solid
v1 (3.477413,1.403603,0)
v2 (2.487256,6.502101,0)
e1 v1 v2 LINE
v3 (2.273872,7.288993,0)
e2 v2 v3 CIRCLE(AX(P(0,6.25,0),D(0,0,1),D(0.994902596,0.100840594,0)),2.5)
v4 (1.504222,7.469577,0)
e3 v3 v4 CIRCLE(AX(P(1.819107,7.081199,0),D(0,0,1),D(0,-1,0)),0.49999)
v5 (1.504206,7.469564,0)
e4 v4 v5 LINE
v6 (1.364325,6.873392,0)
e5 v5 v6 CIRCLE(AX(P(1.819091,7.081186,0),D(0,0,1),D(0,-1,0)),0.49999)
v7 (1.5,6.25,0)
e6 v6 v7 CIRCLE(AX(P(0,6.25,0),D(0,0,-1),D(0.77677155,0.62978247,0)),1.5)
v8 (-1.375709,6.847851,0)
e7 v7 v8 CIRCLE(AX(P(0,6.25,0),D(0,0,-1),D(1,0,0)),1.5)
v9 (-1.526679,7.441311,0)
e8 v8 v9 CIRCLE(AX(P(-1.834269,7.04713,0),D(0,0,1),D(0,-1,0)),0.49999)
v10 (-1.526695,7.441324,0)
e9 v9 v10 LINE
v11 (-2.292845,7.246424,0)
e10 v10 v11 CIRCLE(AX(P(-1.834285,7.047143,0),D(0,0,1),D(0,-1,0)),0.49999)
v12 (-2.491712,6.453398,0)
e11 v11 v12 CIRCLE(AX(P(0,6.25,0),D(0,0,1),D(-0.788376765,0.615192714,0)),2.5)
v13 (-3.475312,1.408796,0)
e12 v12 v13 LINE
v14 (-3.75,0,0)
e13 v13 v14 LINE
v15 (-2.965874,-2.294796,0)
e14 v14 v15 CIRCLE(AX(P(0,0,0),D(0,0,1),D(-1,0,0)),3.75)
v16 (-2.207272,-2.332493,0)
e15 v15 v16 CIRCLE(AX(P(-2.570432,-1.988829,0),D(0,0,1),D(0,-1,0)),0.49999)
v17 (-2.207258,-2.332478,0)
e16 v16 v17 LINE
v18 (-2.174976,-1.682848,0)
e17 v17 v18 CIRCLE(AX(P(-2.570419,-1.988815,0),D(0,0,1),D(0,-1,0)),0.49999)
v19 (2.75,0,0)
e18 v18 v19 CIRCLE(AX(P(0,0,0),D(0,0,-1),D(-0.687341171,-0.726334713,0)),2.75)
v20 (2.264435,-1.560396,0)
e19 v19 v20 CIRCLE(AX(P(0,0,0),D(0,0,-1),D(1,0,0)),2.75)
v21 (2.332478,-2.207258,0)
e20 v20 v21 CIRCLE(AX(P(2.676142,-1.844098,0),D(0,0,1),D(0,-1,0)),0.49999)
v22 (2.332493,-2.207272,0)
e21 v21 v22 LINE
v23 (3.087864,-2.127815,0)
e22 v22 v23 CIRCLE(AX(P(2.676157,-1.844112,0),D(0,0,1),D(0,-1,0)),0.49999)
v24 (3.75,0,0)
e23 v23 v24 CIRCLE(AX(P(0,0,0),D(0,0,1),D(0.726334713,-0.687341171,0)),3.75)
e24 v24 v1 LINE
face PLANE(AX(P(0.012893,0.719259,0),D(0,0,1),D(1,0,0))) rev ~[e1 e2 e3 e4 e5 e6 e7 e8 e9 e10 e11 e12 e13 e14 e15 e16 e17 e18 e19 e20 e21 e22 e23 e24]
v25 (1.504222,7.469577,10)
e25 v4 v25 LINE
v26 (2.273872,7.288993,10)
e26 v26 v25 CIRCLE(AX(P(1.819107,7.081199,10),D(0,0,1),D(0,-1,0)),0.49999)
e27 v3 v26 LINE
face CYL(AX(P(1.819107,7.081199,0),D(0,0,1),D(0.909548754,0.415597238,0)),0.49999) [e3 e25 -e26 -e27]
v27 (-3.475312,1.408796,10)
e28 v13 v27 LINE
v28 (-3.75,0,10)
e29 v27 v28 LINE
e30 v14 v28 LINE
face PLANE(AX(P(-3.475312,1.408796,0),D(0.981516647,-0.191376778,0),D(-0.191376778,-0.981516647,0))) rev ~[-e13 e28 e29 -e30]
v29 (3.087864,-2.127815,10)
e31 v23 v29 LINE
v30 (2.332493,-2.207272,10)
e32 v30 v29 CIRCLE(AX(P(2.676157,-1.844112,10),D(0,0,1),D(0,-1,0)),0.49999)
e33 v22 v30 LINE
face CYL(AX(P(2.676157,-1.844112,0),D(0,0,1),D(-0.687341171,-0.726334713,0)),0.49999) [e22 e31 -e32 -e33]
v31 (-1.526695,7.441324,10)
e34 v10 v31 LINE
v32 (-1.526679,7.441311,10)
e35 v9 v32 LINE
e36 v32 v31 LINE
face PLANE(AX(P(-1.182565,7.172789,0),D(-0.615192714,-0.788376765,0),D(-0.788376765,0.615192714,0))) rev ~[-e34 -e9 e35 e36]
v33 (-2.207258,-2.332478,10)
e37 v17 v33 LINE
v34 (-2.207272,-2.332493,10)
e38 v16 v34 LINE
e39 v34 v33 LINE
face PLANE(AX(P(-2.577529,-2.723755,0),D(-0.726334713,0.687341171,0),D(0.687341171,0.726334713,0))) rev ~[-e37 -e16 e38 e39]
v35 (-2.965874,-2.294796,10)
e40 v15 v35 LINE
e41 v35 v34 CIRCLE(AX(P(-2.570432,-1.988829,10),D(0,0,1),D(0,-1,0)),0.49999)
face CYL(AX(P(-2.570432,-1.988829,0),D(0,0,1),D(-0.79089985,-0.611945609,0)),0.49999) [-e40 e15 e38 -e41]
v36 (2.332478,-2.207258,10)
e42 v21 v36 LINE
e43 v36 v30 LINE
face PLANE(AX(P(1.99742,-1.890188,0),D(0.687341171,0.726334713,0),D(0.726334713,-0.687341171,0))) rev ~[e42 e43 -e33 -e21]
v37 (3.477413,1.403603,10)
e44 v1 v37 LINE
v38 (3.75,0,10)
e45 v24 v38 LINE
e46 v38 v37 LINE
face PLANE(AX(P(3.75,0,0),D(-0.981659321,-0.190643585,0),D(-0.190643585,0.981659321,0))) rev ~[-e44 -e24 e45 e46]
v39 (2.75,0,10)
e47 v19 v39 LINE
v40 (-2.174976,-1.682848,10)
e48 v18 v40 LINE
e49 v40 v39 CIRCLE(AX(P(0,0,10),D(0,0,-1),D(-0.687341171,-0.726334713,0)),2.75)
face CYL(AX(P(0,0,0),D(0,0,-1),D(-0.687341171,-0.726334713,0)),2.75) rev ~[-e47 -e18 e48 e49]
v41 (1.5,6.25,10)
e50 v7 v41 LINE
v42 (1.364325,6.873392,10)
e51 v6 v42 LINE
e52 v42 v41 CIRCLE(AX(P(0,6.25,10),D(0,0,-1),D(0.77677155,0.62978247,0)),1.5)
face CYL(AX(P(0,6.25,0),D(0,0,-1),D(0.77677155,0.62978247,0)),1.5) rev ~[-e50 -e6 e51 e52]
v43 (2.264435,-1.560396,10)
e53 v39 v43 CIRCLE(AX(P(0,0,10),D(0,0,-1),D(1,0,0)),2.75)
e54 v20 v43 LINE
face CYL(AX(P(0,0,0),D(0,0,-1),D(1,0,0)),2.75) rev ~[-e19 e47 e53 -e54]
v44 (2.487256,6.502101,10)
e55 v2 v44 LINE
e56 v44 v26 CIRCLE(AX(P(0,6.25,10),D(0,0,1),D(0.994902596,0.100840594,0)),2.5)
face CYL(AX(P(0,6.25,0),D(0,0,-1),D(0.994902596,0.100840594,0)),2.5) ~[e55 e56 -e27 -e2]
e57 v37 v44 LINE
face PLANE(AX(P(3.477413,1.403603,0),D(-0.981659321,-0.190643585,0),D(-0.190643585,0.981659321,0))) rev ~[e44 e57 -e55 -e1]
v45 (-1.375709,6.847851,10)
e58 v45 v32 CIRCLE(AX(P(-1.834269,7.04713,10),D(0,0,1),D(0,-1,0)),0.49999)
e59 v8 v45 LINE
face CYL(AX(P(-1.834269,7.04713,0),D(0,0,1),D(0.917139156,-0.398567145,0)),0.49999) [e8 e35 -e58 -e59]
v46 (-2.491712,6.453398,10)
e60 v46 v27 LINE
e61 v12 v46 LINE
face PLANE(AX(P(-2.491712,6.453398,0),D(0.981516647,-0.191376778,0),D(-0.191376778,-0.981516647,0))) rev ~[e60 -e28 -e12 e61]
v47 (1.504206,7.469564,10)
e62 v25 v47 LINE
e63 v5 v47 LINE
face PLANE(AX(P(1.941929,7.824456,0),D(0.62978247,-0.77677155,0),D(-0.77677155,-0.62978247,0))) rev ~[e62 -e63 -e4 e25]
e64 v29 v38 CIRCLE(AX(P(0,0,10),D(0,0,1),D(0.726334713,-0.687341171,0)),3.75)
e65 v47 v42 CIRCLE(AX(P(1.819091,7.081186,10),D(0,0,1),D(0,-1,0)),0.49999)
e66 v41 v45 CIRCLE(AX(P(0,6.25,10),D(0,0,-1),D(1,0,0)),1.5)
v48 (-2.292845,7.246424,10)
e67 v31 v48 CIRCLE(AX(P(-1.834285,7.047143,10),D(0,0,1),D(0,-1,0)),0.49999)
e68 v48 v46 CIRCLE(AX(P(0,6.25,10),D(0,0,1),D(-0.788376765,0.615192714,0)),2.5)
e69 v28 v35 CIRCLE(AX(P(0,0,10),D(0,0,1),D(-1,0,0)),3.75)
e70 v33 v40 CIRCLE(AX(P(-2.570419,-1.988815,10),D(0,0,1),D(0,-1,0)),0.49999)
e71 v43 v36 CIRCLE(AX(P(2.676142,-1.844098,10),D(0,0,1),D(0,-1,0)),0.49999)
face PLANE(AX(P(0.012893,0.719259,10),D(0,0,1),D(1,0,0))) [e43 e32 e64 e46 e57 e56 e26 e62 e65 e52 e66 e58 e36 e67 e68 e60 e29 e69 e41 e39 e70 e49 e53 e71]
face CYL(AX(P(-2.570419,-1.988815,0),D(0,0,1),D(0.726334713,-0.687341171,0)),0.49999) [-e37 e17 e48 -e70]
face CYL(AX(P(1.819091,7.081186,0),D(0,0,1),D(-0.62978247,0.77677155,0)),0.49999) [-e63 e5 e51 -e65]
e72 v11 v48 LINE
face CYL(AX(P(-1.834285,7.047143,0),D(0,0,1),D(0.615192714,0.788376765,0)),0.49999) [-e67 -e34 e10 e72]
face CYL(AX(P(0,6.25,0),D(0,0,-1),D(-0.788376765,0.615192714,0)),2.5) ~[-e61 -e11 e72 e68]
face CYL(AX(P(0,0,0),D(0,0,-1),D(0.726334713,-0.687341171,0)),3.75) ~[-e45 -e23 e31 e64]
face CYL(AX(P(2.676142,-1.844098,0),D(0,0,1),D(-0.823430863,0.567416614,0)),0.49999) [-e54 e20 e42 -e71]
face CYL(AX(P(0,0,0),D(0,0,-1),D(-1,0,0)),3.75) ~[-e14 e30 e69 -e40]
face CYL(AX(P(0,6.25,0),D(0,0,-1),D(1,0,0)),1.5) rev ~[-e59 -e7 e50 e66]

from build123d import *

# Parameters (mm, degrees)
F1_DEPTH = 10
F2_R     = 0.49999


# Not quite as in the source:
# - a fillet or chamfer is up to 0.001 mm smaller than in the source, because OpenCascade refuses the exact size


with BuildPart() as f1:
    # F0 (on Top) → F1 (new body)
    with BuildSketch(Plane.XY):
        with BuildLine():
            Line((-3.4753119677, 1.4087961978), (-3.75, 0))
            ThreePointArc((-3.75, 0), (-3.4444328428, -1.4826943014), (-2.5775293913, -2.723755172))
            Line((-2.5775293913, -2.723755172), (-1.8901882203, -1.9974204595))
            ThreePointArc((-1.8901882203, -1.9974204595), (-1.0873091543, 2.5259174181), (2.75, 0))
            ThreePointArc((2.75, 0), (2.5549370113, -1.0172496587), (1.9974204595, -1.8901882203))
            Line((1.9974204595, -1.8901882203), (2.723755172, -2.5775293913))
            ThreePointArc((2.723755172, -2.5775293913), (3.4840050154, -1.3871586256), (3.75, 0))
            Line((3.75, 0), (3.4774126757, 1.4036028936))
            ThreePointArc((3.4774126757, 1.4036028936), (2.0974972168, 3.1085375059), (0, 3.75))
            ThreePointArc((0, 3.75), (-2.0951747252, 3.1101033537), (-3.4753119677, 1.4087961978))
        make_face()
        with BuildLine():
            Line((-2.4917121164, 6.4533979566), (-3.4753119677, 1.4087961978))
            ThreePointArc((-3.4753119677, 1.4087961978), (-2.0951747252, 3.1101033537), (0, 3.75))
            ThreePointArc((0, 3.75), (-1.8382729519, 4.5556704706), (-2.4917121164, 6.4533979566))
        make_face()
        with BuildLine():
            ThreePointArc((2.5, 6.25), (1.767766953, 4.482233047), (0, 3.75))
            ThreePointArc((0, 3.75), (2.0974972168, 3.1085375059), (3.4774126757, 1.4036028936))
            Line((3.4774126757, 1.4036028936), (2.4872564888, 6.5021014854))
            ThreePointArc((2.4872564888, 6.5021014854), (2.4968120896, 6.3762116833), (2.5, 6.25))
        make_face()
        with BuildLine():
            ThreePointArc((-2.4917121164, 6.4533979566), (-1.8382729519, 4.5556704706), (0, 3.75))
            ThreePointArc((0, 3.75), (1.767766953, 4.482233047), (2.5, 6.25))
            ThreePointArc((2.5, 6.25), (2.4968120896, 6.3762116833), (2.4872564888, 6.5021014854))
            ThreePointArc((2.4872564888, 6.5021014854), (2.3111850264, 7.2031126763), (1.9419288742, 7.8244561752))
            Line((1.9419288742, 7.8244561752), (1.1651573245, 7.1946737051))
            ThreePointArc((1.1651573245, 7.1946737051), (1.4138132809, 6.7511307281), (1.5, 6.25))
            ThreePointArc((1.5, 6.25), (-0.4879304654, 4.831576981), (-1.1825651479, 7.1727890718))
            Line((-1.1825651479, 7.1727890718), (-1.9709419132, 7.7879817863))
            ThreePointArc((-1.9709419132, 7.7879817863), (-2.3289694602, 7.1587910945), (-2.4917121164, 6.4533979566))
        make_face()
    extrude(amount=F1_DEPTH)

    # F2 (radius 0.5 in the source; OpenCascade refuses exactly that, so slightly less here)
    f2_edges = [f1.edges().sort_by_distance(p)[0] for p in [
        (-1.182565, 7.172789, 5),
        (1.165157, 7.194674, 5),
        (-1.890188, -1.99742, 5),
        (1.99742, -1.890188, 5),
        (-1.970942, 7.787982, 5),
        (1.941929, 7.824456, 5),
        (2.723755, -2.577529, 5),
        (-2.577529, -2.723755, 5),
    ]]
    fillet(f2_edges, radius=F2_R)


solid = f1.part
